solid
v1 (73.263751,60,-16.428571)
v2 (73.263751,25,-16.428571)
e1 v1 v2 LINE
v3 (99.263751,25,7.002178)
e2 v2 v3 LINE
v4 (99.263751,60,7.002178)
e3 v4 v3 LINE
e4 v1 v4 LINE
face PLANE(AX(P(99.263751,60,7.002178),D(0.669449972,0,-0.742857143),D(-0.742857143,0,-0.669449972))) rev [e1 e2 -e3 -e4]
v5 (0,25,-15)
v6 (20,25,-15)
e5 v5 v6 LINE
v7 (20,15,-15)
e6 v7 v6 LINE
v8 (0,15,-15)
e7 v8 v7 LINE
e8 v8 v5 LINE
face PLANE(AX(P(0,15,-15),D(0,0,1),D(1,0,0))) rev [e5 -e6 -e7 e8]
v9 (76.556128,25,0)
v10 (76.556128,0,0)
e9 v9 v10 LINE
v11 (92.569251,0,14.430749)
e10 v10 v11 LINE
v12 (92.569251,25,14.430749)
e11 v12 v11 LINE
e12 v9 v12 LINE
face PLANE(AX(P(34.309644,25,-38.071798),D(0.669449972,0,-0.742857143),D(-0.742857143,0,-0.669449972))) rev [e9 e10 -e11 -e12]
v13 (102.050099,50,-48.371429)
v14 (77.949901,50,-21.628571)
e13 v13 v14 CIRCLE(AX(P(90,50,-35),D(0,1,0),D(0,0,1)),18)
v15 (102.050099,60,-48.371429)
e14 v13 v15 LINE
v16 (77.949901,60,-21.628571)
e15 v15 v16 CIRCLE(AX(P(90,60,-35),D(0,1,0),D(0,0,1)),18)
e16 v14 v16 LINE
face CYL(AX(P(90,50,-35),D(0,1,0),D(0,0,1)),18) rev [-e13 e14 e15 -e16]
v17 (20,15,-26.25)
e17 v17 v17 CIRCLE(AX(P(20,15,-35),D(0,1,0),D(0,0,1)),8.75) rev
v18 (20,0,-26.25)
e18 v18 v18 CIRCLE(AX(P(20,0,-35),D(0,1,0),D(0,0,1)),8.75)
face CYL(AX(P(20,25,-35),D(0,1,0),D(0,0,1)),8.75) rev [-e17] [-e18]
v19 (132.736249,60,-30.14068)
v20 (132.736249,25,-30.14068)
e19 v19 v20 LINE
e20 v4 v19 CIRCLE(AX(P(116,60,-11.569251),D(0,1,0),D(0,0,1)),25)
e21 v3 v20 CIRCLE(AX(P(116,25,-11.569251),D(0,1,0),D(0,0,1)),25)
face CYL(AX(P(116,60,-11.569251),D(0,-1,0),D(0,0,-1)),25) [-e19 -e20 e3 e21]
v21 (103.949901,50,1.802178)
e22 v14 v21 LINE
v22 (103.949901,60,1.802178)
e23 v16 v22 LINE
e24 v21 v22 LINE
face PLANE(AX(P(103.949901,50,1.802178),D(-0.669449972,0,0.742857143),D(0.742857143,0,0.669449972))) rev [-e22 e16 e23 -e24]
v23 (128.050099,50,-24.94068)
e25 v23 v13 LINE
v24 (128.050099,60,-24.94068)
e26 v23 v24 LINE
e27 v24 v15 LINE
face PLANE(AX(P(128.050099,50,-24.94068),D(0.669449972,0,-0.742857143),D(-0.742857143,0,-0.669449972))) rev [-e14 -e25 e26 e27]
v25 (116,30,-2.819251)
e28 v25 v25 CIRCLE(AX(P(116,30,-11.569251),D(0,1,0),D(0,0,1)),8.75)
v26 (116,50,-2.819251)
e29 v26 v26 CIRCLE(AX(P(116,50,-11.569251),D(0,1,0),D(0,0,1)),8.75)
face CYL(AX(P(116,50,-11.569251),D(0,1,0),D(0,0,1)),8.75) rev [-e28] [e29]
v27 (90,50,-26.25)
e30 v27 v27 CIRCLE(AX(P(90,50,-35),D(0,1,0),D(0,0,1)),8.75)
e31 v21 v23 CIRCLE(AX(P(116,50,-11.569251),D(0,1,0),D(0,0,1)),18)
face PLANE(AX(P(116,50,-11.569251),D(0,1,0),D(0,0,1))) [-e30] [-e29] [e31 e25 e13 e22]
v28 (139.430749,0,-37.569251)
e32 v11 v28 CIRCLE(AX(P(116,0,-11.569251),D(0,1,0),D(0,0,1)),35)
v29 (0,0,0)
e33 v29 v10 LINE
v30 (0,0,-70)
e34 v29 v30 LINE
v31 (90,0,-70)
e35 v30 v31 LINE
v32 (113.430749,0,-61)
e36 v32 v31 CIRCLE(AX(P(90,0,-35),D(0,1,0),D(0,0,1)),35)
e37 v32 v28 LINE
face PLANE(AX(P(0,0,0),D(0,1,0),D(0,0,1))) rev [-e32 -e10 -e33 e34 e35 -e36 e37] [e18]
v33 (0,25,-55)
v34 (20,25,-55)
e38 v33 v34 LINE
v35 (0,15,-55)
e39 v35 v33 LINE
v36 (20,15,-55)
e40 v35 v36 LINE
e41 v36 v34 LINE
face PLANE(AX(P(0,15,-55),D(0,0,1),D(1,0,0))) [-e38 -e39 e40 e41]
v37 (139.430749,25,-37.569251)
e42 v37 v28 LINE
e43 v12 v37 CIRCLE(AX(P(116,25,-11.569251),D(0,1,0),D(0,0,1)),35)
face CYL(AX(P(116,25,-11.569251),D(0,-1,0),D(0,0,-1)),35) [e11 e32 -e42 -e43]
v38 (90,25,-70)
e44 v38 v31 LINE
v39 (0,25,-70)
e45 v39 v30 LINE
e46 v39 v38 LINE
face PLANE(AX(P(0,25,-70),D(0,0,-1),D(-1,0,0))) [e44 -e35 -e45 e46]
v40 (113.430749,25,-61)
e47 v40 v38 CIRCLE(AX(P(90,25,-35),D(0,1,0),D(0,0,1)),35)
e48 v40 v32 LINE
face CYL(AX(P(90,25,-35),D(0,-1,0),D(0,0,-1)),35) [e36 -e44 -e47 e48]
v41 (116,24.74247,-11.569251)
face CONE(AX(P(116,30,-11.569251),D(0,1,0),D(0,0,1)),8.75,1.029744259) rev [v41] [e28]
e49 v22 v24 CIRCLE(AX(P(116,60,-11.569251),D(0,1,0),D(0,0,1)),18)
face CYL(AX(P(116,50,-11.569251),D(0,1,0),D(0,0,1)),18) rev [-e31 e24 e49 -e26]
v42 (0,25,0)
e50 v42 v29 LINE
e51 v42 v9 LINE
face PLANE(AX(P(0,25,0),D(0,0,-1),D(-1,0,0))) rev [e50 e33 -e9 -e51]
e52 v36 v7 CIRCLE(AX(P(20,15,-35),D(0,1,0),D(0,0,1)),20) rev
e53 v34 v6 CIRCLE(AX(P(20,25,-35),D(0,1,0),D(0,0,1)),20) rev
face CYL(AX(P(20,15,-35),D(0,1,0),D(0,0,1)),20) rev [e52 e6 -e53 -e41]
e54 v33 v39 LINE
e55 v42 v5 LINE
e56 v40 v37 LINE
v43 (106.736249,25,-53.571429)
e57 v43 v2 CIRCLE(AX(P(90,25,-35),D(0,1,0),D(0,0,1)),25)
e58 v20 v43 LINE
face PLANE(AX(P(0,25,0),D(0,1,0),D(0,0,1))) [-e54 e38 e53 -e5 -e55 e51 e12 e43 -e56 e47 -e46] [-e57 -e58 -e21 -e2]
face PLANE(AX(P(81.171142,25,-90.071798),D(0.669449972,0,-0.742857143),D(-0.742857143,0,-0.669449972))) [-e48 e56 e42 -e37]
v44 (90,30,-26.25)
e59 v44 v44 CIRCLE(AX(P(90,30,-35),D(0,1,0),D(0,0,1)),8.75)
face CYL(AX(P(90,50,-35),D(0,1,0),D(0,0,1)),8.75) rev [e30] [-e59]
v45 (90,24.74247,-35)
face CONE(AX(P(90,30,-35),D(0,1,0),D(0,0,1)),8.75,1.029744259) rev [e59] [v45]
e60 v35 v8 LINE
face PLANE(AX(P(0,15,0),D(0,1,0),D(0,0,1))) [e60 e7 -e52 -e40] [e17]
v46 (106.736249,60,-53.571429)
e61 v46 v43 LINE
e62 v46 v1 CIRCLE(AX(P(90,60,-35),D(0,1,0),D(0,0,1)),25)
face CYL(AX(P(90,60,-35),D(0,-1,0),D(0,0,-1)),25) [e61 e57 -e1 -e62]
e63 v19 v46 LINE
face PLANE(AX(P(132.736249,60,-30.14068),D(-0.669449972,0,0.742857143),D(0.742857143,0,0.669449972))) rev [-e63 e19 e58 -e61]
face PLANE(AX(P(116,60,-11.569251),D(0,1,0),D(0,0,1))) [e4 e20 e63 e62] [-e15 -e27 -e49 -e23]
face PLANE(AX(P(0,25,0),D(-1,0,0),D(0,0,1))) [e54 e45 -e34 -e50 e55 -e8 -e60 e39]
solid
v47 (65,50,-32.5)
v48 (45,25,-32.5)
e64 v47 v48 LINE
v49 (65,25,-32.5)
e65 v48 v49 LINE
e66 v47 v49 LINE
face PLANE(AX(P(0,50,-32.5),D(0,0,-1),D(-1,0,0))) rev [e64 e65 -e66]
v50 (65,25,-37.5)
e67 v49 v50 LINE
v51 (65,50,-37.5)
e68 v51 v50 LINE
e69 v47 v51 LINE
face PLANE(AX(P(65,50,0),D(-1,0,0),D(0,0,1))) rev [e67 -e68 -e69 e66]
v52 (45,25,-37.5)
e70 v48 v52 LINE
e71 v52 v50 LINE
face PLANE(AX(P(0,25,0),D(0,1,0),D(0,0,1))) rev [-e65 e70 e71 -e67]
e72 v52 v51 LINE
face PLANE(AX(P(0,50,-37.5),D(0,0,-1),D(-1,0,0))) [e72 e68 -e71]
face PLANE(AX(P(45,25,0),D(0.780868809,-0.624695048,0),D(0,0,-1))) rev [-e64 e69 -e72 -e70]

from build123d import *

# Parameters (mm, degrees)
BOSS_EXTRUDE1_DEPTH    = 25
BOSS_EXTRUDE2_DEPTH    = 35
CUT_EXTRUDE1_DEPTH     = 10
M20_TAPPED_HOLE1_D     = 17.5
M20_TAPPED_HOLE1_DEPTH = 20
M20_TAPPED_HOLE1_TIP   = 5.257530416
M20_TAPPED_HOLE2_D     = 17.5
M20_TAPPED_HOLE2_DEPTH = 27.5
M20_TAPPED_HOLE2_TIP   = 5.257530416
CUT_EXTRUDE2_START     = -10
SKETCH8_R              = 8.75
CUT_EXTRUDE2_DEPTH     = 10
SKETCH9_W              = 20
SKETCH9_H              = 2.5
BOSS_EXTRUDE4_DEPTH    = 25
CHAMFER1_SIZE          = 25
CHAMFER1_SIZE_2        = 20


with BuildPart() as part:
    # Sketch1 → Boss-Extrude1 (new body)
    with BuildSketch(Plane(origin=(0, 0, 0), x_dir=(1, 0, 0), z_dir=(0, 1, 0))):
        with BuildLine():
            Line((0, 70), (0, 0))
            Line((0, 0), (76.556127607, 0))
            Line((76.556127607, 0), (92.569250972, -14.430749028))
            ThreePointArc((92.569250972, -14.430749028), (142, -11.861498055), (139.430749028, 37.569250972))
            Line((139.430749028, 37.569250972), (113.430749028, 61))
            ThreePointArc((113.430749028, 61), (102.549900398, 67.672618505), (90, 70))
            Line((90, 70), (0, 70))
        make_face()
    extrude(amount=BOSS_EXTRUDE1_DEPTH)

    # Sketch2 → Boss-Extrude2 (add)
    with BuildSketch(Plane(origin=(0, 25, 0), x_dir=(1, 0, 0), z_dir=(0, 1, 0))):
        with BuildLine():
            Line((99.263750694, -7.002177599), (73.263750694, 16.428571429))
            ThreePointArc((73.263750694, 16.428571429), (71.428571429, 51.736249306), (106.736249306, 53.571428571))
            Line((106.736249306, 53.571428571), (132.736249306, 30.140679544))
            ThreePointArc((132.736249306, 30.140679544), (134.571428571, -5.166998333), (99.263750694, -7.002177599))
        make_face()
    extrude(amount=BOSS_EXTRUDE2_DEPTH)

    # Sketch3 → Cut-Extrude1 (cut)
    with BuildSketch(Plane(origin=(0, 60, 0), x_dir=(1, 0, 0), z_dir=(0, 1, 0))):
        with BuildLine():
            Line((103.9499005, -1.802177599), (77.9499005, 21.628571429))
            ThreePointArc((77.9499005, 21.628571429), (76.628571429, 47.0500995), (102.0500995, 48.371428571))
            Line((102.0500995, 48.371428571), (128.0500995, 24.940679544))
            ThreePointArc((128.0500995, 24.940679544), (129.371428571, -0.480848528), (103.9499005, -1.802177599))
        make_face()
    extrude(amount=-CUT_EXTRUDE1_DEPTH, mode=Mode.SUBTRACT)

    # M20 Tapped Hole1
    with Locations(Plane(origin=(90, 50, -35), x_dir=(0, 0, 1), z_dir=(0, 1, 0))):
        with Locations((0, 0), (23.430749028, 26)):
            Hole(M20_TAPPED_HOLE1_D / 2, depth=M20_TAPPED_HOLE1_DEPTH)
            with Locations((0, 0, -(M20_TAPPED_HOLE1_DEPTH + M20_TAPPED_HOLE1_TIP / 2))):  # 118° drill point
                Cone(0, M20_TAPPED_HOLE1_D / 2, M20_TAPPED_HOLE1_TIP, mode=Mode.SUBTRACT)

    # M20 Tapped Hole2
    with Locations(Plane(origin=(20, 25, -35), x_dir=(0, 0, 1), z_dir=(0, 1, 0))):
        with Locations((0, 0)):
            Hole(M20_TAPPED_HOLE2_D / 2, depth=M20_TAPPED_HOLE2_DEPTH)
            with Locations((0, 0, -(M20_TAPPED_HOLE2_DEPTH + M20_TAPPED_HOLE2_TIP / 2))):  # 118° drill point
                Cone(0, M20_TAPPED_HOLE2_D / 2, M20_TAPPED_HOLE2_TIP, mode=Mode.SUBTRACT)

    # Sketch8 → Cut-Extrude2 (cut)
    with BuildSketch(Plane(origin=(0, 25, 0), x_dir=(1, 0, 0), z_dir=(0, 1, 0)).offset(CUT_EXTRUDE2_START)):
        with BuildLine():
            Line((20, 55), (0, 55))
            Line((0, 55), (0, 15))
            Line((0, 15), (20, 15))
            ThreePointArc((20, 15), (40, 35), (20, 55))
        make_face()
        with Locations(Location((20, 35, 0), (0, 0, 270))):
            Circle(SKETCH8_R, mode=Mode.SUBTRACT)
    extrude(amount=CUT_EXTRUDE2_DEPTH, mode=Mode.SUBTRACT)


with BuildPart() as body_2:
    # Sketch9 → Boss-Extrude4 (new body)
    with BuildSketch(Plane(origin=(0, 25, 0), x_dir=(1, 0, 0), z_dir=(0, 1, 0))):
        with Locations((55, 33.75)):
            Rectangle(SKETCH9_W, SKETCH9_H)
        with Locations((55, 36.25)):
            Rectangle(SKETCH9_W, SKETCH9_H)
    extrude(amount=BOSS_EXTRUDE4_DEPTH)

    # Chamfer1
    # the kernel refuses this chamfer: 25, 20 mm, written as the material it takes off along each edge
    with BuildSketch(Plane(origin=(45, 50, 31.971090443), x_dir=(-0.024223843712695276, -0.9997065596442702, 0), z_dir=(0, 0, -1))) as chamfer1_piece_1:
        Polygon((CHAMFER1_SIZE * 0.999706559644, -CHAMFER1_SIZE * 0.0242238437127), (-CHAMFER1_SIZE_2 * 0.0242238437127, -CHAMFER1_SIZE_2 * 0.999706559644), (0, 0), align=None)
    extrude(amount=133.942180887, mode=Mode.SUBTRACT)


solid = Compound([part.part, body_2.part])
